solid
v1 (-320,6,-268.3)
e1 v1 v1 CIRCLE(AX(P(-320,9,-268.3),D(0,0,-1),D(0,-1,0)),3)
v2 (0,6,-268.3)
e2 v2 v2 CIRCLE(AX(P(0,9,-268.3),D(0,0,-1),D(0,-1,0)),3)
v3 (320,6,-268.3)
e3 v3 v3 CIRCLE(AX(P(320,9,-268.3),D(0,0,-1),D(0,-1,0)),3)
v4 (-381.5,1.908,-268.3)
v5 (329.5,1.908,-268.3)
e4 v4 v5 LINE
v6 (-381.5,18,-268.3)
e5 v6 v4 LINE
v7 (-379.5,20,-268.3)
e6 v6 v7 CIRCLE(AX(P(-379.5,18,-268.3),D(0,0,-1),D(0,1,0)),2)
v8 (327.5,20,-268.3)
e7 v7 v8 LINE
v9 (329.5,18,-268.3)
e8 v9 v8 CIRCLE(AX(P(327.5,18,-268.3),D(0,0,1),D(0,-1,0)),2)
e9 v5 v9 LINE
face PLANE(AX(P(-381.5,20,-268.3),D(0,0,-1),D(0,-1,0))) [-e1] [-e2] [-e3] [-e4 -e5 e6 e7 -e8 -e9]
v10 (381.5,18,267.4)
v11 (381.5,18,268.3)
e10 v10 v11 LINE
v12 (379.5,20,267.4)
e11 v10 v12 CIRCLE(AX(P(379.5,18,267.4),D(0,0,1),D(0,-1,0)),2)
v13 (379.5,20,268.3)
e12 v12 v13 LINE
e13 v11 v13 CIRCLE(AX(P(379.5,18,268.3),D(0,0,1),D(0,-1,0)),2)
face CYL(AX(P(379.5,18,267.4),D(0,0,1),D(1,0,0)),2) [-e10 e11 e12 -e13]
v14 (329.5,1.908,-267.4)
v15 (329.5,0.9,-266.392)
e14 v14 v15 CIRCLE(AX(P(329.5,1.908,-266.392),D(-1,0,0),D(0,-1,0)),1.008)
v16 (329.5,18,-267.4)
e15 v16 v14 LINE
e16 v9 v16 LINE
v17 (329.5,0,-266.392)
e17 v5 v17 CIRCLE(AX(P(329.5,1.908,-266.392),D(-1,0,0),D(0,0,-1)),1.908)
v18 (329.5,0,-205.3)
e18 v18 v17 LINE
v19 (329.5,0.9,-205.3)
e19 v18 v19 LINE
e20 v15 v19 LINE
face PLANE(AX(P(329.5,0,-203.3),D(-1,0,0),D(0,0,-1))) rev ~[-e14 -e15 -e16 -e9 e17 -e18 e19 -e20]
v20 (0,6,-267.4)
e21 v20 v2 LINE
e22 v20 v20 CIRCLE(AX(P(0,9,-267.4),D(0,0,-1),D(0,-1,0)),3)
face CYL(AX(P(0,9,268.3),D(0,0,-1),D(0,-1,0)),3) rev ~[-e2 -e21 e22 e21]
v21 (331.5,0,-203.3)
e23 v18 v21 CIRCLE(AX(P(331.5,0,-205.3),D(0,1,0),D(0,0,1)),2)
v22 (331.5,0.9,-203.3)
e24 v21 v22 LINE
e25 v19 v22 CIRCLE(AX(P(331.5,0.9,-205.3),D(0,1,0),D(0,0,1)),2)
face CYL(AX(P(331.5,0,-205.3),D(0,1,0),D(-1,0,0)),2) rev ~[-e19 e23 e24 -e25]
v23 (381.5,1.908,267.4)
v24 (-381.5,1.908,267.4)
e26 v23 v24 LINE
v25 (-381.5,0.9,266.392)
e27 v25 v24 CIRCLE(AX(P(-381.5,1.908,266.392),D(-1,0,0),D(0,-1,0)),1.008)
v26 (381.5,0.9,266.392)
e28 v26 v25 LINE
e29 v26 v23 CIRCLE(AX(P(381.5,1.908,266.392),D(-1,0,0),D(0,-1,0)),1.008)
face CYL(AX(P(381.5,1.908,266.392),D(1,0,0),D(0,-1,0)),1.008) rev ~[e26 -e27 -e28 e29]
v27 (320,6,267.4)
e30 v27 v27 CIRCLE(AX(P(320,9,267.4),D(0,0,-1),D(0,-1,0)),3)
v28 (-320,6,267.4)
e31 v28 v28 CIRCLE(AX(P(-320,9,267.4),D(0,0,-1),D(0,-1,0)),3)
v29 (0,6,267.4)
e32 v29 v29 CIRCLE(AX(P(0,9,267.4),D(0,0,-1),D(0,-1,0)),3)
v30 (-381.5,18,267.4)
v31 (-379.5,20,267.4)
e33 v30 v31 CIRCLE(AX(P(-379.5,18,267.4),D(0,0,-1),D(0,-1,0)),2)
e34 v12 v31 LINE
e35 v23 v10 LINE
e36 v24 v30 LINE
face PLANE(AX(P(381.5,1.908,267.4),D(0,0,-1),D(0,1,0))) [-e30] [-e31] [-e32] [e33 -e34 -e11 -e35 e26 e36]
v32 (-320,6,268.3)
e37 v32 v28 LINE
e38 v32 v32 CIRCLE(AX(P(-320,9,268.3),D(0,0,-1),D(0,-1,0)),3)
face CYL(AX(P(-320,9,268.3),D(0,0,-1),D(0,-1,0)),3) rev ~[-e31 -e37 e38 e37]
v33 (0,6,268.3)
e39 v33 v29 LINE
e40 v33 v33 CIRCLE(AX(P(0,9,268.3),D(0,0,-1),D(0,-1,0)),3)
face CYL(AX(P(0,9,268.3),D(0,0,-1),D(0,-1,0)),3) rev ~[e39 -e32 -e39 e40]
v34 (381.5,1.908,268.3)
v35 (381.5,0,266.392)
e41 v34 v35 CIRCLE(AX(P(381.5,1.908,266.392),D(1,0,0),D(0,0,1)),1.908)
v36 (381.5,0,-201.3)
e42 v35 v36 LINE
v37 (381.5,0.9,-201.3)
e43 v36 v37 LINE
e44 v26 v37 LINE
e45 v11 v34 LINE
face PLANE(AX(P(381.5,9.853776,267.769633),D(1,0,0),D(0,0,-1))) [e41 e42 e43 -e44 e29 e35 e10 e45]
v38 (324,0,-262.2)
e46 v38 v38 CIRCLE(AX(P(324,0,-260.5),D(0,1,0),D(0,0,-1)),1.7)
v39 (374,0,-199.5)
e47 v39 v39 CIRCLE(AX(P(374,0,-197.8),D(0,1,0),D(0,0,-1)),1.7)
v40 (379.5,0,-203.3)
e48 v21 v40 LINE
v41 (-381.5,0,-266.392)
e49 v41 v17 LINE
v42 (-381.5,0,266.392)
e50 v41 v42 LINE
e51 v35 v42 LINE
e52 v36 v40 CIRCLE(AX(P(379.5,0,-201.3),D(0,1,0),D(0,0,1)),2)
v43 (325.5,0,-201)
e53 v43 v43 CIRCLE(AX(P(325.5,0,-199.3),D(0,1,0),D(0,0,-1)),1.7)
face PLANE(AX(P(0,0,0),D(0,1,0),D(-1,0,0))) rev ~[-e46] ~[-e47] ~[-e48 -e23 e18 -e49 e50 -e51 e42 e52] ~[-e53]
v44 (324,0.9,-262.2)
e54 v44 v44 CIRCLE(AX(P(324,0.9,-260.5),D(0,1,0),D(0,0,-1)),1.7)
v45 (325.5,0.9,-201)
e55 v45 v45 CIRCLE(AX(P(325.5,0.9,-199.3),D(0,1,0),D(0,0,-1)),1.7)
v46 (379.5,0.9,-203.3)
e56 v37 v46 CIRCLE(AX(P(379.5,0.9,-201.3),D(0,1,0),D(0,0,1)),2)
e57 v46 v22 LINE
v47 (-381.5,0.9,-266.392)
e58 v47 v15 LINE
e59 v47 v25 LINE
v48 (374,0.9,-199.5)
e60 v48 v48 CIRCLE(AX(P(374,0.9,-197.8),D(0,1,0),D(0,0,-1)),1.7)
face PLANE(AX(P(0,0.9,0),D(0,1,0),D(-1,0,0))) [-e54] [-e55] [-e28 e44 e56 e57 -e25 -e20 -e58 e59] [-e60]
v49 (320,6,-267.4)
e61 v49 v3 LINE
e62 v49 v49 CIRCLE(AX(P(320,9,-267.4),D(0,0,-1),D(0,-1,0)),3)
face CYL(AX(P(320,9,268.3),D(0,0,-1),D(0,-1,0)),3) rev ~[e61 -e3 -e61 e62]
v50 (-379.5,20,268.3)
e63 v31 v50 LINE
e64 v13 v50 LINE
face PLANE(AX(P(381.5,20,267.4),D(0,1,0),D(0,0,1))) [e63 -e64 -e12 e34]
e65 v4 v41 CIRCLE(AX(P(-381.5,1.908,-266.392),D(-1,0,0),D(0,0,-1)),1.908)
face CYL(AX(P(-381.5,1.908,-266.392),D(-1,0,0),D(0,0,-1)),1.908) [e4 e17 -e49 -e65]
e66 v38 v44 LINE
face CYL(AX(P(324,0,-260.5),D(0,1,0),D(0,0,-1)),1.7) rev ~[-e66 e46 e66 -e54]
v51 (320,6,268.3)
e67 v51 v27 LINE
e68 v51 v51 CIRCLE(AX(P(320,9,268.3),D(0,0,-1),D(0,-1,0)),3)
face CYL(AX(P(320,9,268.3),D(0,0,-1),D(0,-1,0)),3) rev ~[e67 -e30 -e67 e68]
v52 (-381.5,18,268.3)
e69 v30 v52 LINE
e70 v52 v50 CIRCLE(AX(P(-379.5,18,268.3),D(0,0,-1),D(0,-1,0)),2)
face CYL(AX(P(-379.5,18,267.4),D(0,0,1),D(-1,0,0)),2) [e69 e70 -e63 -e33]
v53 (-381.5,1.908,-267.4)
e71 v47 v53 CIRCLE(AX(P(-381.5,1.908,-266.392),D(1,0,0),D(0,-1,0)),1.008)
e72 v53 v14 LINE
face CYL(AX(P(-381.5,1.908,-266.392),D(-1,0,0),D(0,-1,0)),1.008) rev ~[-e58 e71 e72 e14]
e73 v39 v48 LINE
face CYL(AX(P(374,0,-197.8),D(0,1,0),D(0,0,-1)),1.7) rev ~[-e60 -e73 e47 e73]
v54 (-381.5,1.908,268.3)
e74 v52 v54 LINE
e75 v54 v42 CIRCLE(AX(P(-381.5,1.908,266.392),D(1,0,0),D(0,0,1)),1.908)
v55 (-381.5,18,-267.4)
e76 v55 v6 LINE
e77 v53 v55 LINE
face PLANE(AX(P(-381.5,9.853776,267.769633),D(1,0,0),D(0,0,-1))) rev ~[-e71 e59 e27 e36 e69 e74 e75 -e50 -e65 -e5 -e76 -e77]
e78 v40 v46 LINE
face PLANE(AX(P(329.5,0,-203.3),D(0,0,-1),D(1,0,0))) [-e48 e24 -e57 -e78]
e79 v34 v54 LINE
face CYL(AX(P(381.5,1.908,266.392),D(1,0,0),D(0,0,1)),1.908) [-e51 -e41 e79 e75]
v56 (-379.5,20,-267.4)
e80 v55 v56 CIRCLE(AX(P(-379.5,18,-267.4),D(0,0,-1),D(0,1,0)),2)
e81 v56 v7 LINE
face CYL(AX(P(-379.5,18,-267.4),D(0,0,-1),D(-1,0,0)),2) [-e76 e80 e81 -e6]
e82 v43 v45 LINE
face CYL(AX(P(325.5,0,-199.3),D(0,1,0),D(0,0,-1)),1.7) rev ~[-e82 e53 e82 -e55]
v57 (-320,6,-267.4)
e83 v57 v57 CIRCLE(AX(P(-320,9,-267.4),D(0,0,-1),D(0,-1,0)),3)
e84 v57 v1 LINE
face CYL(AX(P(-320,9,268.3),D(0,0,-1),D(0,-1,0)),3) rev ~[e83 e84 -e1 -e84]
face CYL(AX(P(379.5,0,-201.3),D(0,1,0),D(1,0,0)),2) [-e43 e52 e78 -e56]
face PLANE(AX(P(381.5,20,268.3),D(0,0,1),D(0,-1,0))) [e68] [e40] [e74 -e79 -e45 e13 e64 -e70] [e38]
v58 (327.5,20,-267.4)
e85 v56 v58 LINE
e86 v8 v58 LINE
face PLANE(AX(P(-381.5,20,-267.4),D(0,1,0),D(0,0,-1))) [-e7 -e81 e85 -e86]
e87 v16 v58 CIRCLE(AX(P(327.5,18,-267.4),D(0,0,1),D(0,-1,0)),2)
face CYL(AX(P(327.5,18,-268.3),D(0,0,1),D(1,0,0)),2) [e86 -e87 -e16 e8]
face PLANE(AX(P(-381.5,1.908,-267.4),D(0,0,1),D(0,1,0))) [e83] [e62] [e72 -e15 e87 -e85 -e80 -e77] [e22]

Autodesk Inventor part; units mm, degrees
ref_plane "YZ Plane" through (0, 0, 0) normal (1, 0, 0) x (0, 1, 0)
ref_plane "XZ Plane" through (0, 0, 0) normal (0, 1, 0) x (-1, 0, 0)
ref_plane "XY Plane" through (0, 0, 0) normal (0, 0, 1) x (1, 0, 0)
sketch "Sketch1" plane through (0, 0, 0) normal (0, 1, 0) x (-1, 0, 0)
  line L0 (381.5, 268.3) -> (-381.5, 268.3)
  line L1 (-381.5, 268.3) -> (-381.5, -268.3)
  line L2 (-381.5, -268.3) -> (381.5, -268.3)
  line L3 (381.5, -268.3) -> (381.5, 268.3)
  line L4 (381.5, 268.3) -> (-381.5, -268.3) construction
  line L5 (-381.5, 268.3) -> (381.5, -268.3) construction
  point P0 (0, 0)
  dimension "d0" = 763
  dimension "d1" = 536.6
extrude "Plate1" add sketch "Sketch1" along normal blind 0.9
sketch "Sketch2" plane through (381.5, 0, 267.4) normal (0, 0, 1) x (1, 0, 0)
  line L0 (-763, 0) -> (0, 0)
  line L1 (0, 0) -> (0, 20)
  line L2 (0, 20) -> (-763, 20)
  line L3 (-763, 20) -> (-763, 0)
edge flange "Flange1" height 20 angle 90 thickness 0.9 bend radius 1.008 thickness toward (0, 0, 1) relief tear relief width 0.9 relief depth 0.45 corner gap 1.008 corner form 0 edges at (0, 0.9, 268.3) (0, 0.9, -268.3) wall of the first edge with corners at (-381.5, 0, 267.4) (381.5, 0, 267.4) (381.5, 20, 267.4) (-381.5, 20, 267.4)
bend "Bend1"
corner "Corner1"
sketch "Sketch3" plane through (-381.5, 20, 268.3) normal (0, 0, 1) x (1, 0, 0)
  circle A0 centre (381.5, -11) radius 1.7
  circle A1 centre (61.5, -11) radius 1.7
  line L0 (0, 0) -> (763, 0) projected
  point P0 (381.5, -20)
  point P1 (701.5, -11)
  dimension "d20" = 11
  dimension "d41" = 320
  dimension "d42" = 320
hole "Hole1" at (-320, 9, 268.3) at (0, 9, 268.3) at (320, 9, 268.3) direction (0, 0, -1) diameter 6 end through all
sketch "Sketch6" plane through (0, 0, 0) normal (0, -1, 0) x (1, 0, 0)
  line L0 (381.5, -268.3) -> (-381.5, -268.3) projected
  line L1 (329.5, -203.3) -> (329.5, -268.3)
  line L2 (329.5, -268.3) -> (381.5, -268.3)
  line L3 (381.5, -268.3) -> (381.5, -203.3)
  line L4 (329.5, -203.3) -> (381.5, -203.3)
  point P0 (0, 0)
  dimension "d39" = 52
  dimension "d44" = 65
extrude "Cut1" cut sketch "Sketch6" against normal through all
fillet "Corner Round1" radius 2 6 edges at (329.5, 20, -267.85) (381.5, 20, 267.85) (-381.5, 20, -267.85) (-381.5, 20, 267.85) (329.5, 0.45, -203.3) (381.5, 0.45, -203.3)
sketch "Sketch8" plane through (0, 0, 0) normal (0, -1, 0) x (1, 0, 0)
  circle A0 centre (325.5, -199.3) radius 1.8 projected
  circle A1 centre (374, -197.8) radius 1.8 projected
  circle A2 centre (324, -260.5) radius 1.8 projected
  arc A3 (377, -268) -> (381.5, -263.5) centre (377, -263.5) ccw projected
  line L0 (381.5, -263.5) -> (381.5, -193.3) projected
  arc A4 (381.5, -193.3) -> (378.5, -190.3) centre (378.5, -193.3) ccw projected
  line L1 (378.5, -190.3) -> (322.5, -190.3) projected
  arc A5 (322.5, -190.3) -> (316.5, -196.3) centre (322.5, -196.3) ccw projected
  line L2 (316.5, -196.3) -> (316.5, -265) projected
  arc A6 (316.5, -265) -> (319.5, -268) centre (319.5, -265) ccw projected
  line L3 (319.5, -268) -> (377, -268) projected
  line L4 (379.5, -208.3) -> (379.5, -263) projected
  arc A7 (376.5, -266) -> (379.5, -263) centre (376.5, -263) ccw projected
  line L5 (376.5, -266) -> (334.5, -266) projected
  arc A8 (331.5, -263) -> (334.5, -266) centre (334.5, -263) ccw projected
  line L6 (331.5, -263) -> (331.5, -208.3) projected
  arc A9 (334.5, -205.3) -> (331.5, -208.3) centre (334.5, -208.3) ccw projected
  line L7 (334.5, -205.3) -> (376.5, -205.3) projected
  arc A10 (379.5, -208.3) -> (376.5, -205.3) centre (376.5, -208.3) ccw projected
  point P0 (0, 0)
hole "Hole2" at (374, 0, -197.8) at (325.5, 0, -199.3) at (324, 0, -260.5) direction (0, 1, 0) diameter 3.4 depth 0.9 tip angle 118 clearance for "Countersunk Flat Head Screw ISO 2009/7046" size "M3" standard "ISO"
equation "\"d18\" = Thickness"
equation "\"d50\" = Thickness"
equation "\"d2\" = Thickness"
equation "\"d3\" = BendReliefWidth"
equation "\"d4\" = BendReliefDepth"
equation "\"d5\" = MinimumRemnant"
equation "\"d6\" = TransitionRadius"
equation "\"d9\" = BendRadius"
equation "\"d10\" = CornerReliefSize"
equation "\"d11\" = GapSize"
equation "\"d12\" = JacobiRadiusSize"
equation "\"BendReliefWidth\" = Thickness"
equation "\"BendReliefDepth\" = 0.5 * Thickness"
equation "\"CornerReliefSize\" = 4 * Thickness"
equation "\"MinimumRemnant\" = 2 * Thickness"
equation "\"TransitionRadius\" = BendRadius"
equation "\"JacobiRadiusSize\" = BendRadius"
equation "\"GapSize\" = Thickness"
equation "\"Thickness\" = 0.9"
equation "\"BendRadius\" = 1.008"
properties part number "SP41V1 Cubre Base" material "Steel, Carbon"
